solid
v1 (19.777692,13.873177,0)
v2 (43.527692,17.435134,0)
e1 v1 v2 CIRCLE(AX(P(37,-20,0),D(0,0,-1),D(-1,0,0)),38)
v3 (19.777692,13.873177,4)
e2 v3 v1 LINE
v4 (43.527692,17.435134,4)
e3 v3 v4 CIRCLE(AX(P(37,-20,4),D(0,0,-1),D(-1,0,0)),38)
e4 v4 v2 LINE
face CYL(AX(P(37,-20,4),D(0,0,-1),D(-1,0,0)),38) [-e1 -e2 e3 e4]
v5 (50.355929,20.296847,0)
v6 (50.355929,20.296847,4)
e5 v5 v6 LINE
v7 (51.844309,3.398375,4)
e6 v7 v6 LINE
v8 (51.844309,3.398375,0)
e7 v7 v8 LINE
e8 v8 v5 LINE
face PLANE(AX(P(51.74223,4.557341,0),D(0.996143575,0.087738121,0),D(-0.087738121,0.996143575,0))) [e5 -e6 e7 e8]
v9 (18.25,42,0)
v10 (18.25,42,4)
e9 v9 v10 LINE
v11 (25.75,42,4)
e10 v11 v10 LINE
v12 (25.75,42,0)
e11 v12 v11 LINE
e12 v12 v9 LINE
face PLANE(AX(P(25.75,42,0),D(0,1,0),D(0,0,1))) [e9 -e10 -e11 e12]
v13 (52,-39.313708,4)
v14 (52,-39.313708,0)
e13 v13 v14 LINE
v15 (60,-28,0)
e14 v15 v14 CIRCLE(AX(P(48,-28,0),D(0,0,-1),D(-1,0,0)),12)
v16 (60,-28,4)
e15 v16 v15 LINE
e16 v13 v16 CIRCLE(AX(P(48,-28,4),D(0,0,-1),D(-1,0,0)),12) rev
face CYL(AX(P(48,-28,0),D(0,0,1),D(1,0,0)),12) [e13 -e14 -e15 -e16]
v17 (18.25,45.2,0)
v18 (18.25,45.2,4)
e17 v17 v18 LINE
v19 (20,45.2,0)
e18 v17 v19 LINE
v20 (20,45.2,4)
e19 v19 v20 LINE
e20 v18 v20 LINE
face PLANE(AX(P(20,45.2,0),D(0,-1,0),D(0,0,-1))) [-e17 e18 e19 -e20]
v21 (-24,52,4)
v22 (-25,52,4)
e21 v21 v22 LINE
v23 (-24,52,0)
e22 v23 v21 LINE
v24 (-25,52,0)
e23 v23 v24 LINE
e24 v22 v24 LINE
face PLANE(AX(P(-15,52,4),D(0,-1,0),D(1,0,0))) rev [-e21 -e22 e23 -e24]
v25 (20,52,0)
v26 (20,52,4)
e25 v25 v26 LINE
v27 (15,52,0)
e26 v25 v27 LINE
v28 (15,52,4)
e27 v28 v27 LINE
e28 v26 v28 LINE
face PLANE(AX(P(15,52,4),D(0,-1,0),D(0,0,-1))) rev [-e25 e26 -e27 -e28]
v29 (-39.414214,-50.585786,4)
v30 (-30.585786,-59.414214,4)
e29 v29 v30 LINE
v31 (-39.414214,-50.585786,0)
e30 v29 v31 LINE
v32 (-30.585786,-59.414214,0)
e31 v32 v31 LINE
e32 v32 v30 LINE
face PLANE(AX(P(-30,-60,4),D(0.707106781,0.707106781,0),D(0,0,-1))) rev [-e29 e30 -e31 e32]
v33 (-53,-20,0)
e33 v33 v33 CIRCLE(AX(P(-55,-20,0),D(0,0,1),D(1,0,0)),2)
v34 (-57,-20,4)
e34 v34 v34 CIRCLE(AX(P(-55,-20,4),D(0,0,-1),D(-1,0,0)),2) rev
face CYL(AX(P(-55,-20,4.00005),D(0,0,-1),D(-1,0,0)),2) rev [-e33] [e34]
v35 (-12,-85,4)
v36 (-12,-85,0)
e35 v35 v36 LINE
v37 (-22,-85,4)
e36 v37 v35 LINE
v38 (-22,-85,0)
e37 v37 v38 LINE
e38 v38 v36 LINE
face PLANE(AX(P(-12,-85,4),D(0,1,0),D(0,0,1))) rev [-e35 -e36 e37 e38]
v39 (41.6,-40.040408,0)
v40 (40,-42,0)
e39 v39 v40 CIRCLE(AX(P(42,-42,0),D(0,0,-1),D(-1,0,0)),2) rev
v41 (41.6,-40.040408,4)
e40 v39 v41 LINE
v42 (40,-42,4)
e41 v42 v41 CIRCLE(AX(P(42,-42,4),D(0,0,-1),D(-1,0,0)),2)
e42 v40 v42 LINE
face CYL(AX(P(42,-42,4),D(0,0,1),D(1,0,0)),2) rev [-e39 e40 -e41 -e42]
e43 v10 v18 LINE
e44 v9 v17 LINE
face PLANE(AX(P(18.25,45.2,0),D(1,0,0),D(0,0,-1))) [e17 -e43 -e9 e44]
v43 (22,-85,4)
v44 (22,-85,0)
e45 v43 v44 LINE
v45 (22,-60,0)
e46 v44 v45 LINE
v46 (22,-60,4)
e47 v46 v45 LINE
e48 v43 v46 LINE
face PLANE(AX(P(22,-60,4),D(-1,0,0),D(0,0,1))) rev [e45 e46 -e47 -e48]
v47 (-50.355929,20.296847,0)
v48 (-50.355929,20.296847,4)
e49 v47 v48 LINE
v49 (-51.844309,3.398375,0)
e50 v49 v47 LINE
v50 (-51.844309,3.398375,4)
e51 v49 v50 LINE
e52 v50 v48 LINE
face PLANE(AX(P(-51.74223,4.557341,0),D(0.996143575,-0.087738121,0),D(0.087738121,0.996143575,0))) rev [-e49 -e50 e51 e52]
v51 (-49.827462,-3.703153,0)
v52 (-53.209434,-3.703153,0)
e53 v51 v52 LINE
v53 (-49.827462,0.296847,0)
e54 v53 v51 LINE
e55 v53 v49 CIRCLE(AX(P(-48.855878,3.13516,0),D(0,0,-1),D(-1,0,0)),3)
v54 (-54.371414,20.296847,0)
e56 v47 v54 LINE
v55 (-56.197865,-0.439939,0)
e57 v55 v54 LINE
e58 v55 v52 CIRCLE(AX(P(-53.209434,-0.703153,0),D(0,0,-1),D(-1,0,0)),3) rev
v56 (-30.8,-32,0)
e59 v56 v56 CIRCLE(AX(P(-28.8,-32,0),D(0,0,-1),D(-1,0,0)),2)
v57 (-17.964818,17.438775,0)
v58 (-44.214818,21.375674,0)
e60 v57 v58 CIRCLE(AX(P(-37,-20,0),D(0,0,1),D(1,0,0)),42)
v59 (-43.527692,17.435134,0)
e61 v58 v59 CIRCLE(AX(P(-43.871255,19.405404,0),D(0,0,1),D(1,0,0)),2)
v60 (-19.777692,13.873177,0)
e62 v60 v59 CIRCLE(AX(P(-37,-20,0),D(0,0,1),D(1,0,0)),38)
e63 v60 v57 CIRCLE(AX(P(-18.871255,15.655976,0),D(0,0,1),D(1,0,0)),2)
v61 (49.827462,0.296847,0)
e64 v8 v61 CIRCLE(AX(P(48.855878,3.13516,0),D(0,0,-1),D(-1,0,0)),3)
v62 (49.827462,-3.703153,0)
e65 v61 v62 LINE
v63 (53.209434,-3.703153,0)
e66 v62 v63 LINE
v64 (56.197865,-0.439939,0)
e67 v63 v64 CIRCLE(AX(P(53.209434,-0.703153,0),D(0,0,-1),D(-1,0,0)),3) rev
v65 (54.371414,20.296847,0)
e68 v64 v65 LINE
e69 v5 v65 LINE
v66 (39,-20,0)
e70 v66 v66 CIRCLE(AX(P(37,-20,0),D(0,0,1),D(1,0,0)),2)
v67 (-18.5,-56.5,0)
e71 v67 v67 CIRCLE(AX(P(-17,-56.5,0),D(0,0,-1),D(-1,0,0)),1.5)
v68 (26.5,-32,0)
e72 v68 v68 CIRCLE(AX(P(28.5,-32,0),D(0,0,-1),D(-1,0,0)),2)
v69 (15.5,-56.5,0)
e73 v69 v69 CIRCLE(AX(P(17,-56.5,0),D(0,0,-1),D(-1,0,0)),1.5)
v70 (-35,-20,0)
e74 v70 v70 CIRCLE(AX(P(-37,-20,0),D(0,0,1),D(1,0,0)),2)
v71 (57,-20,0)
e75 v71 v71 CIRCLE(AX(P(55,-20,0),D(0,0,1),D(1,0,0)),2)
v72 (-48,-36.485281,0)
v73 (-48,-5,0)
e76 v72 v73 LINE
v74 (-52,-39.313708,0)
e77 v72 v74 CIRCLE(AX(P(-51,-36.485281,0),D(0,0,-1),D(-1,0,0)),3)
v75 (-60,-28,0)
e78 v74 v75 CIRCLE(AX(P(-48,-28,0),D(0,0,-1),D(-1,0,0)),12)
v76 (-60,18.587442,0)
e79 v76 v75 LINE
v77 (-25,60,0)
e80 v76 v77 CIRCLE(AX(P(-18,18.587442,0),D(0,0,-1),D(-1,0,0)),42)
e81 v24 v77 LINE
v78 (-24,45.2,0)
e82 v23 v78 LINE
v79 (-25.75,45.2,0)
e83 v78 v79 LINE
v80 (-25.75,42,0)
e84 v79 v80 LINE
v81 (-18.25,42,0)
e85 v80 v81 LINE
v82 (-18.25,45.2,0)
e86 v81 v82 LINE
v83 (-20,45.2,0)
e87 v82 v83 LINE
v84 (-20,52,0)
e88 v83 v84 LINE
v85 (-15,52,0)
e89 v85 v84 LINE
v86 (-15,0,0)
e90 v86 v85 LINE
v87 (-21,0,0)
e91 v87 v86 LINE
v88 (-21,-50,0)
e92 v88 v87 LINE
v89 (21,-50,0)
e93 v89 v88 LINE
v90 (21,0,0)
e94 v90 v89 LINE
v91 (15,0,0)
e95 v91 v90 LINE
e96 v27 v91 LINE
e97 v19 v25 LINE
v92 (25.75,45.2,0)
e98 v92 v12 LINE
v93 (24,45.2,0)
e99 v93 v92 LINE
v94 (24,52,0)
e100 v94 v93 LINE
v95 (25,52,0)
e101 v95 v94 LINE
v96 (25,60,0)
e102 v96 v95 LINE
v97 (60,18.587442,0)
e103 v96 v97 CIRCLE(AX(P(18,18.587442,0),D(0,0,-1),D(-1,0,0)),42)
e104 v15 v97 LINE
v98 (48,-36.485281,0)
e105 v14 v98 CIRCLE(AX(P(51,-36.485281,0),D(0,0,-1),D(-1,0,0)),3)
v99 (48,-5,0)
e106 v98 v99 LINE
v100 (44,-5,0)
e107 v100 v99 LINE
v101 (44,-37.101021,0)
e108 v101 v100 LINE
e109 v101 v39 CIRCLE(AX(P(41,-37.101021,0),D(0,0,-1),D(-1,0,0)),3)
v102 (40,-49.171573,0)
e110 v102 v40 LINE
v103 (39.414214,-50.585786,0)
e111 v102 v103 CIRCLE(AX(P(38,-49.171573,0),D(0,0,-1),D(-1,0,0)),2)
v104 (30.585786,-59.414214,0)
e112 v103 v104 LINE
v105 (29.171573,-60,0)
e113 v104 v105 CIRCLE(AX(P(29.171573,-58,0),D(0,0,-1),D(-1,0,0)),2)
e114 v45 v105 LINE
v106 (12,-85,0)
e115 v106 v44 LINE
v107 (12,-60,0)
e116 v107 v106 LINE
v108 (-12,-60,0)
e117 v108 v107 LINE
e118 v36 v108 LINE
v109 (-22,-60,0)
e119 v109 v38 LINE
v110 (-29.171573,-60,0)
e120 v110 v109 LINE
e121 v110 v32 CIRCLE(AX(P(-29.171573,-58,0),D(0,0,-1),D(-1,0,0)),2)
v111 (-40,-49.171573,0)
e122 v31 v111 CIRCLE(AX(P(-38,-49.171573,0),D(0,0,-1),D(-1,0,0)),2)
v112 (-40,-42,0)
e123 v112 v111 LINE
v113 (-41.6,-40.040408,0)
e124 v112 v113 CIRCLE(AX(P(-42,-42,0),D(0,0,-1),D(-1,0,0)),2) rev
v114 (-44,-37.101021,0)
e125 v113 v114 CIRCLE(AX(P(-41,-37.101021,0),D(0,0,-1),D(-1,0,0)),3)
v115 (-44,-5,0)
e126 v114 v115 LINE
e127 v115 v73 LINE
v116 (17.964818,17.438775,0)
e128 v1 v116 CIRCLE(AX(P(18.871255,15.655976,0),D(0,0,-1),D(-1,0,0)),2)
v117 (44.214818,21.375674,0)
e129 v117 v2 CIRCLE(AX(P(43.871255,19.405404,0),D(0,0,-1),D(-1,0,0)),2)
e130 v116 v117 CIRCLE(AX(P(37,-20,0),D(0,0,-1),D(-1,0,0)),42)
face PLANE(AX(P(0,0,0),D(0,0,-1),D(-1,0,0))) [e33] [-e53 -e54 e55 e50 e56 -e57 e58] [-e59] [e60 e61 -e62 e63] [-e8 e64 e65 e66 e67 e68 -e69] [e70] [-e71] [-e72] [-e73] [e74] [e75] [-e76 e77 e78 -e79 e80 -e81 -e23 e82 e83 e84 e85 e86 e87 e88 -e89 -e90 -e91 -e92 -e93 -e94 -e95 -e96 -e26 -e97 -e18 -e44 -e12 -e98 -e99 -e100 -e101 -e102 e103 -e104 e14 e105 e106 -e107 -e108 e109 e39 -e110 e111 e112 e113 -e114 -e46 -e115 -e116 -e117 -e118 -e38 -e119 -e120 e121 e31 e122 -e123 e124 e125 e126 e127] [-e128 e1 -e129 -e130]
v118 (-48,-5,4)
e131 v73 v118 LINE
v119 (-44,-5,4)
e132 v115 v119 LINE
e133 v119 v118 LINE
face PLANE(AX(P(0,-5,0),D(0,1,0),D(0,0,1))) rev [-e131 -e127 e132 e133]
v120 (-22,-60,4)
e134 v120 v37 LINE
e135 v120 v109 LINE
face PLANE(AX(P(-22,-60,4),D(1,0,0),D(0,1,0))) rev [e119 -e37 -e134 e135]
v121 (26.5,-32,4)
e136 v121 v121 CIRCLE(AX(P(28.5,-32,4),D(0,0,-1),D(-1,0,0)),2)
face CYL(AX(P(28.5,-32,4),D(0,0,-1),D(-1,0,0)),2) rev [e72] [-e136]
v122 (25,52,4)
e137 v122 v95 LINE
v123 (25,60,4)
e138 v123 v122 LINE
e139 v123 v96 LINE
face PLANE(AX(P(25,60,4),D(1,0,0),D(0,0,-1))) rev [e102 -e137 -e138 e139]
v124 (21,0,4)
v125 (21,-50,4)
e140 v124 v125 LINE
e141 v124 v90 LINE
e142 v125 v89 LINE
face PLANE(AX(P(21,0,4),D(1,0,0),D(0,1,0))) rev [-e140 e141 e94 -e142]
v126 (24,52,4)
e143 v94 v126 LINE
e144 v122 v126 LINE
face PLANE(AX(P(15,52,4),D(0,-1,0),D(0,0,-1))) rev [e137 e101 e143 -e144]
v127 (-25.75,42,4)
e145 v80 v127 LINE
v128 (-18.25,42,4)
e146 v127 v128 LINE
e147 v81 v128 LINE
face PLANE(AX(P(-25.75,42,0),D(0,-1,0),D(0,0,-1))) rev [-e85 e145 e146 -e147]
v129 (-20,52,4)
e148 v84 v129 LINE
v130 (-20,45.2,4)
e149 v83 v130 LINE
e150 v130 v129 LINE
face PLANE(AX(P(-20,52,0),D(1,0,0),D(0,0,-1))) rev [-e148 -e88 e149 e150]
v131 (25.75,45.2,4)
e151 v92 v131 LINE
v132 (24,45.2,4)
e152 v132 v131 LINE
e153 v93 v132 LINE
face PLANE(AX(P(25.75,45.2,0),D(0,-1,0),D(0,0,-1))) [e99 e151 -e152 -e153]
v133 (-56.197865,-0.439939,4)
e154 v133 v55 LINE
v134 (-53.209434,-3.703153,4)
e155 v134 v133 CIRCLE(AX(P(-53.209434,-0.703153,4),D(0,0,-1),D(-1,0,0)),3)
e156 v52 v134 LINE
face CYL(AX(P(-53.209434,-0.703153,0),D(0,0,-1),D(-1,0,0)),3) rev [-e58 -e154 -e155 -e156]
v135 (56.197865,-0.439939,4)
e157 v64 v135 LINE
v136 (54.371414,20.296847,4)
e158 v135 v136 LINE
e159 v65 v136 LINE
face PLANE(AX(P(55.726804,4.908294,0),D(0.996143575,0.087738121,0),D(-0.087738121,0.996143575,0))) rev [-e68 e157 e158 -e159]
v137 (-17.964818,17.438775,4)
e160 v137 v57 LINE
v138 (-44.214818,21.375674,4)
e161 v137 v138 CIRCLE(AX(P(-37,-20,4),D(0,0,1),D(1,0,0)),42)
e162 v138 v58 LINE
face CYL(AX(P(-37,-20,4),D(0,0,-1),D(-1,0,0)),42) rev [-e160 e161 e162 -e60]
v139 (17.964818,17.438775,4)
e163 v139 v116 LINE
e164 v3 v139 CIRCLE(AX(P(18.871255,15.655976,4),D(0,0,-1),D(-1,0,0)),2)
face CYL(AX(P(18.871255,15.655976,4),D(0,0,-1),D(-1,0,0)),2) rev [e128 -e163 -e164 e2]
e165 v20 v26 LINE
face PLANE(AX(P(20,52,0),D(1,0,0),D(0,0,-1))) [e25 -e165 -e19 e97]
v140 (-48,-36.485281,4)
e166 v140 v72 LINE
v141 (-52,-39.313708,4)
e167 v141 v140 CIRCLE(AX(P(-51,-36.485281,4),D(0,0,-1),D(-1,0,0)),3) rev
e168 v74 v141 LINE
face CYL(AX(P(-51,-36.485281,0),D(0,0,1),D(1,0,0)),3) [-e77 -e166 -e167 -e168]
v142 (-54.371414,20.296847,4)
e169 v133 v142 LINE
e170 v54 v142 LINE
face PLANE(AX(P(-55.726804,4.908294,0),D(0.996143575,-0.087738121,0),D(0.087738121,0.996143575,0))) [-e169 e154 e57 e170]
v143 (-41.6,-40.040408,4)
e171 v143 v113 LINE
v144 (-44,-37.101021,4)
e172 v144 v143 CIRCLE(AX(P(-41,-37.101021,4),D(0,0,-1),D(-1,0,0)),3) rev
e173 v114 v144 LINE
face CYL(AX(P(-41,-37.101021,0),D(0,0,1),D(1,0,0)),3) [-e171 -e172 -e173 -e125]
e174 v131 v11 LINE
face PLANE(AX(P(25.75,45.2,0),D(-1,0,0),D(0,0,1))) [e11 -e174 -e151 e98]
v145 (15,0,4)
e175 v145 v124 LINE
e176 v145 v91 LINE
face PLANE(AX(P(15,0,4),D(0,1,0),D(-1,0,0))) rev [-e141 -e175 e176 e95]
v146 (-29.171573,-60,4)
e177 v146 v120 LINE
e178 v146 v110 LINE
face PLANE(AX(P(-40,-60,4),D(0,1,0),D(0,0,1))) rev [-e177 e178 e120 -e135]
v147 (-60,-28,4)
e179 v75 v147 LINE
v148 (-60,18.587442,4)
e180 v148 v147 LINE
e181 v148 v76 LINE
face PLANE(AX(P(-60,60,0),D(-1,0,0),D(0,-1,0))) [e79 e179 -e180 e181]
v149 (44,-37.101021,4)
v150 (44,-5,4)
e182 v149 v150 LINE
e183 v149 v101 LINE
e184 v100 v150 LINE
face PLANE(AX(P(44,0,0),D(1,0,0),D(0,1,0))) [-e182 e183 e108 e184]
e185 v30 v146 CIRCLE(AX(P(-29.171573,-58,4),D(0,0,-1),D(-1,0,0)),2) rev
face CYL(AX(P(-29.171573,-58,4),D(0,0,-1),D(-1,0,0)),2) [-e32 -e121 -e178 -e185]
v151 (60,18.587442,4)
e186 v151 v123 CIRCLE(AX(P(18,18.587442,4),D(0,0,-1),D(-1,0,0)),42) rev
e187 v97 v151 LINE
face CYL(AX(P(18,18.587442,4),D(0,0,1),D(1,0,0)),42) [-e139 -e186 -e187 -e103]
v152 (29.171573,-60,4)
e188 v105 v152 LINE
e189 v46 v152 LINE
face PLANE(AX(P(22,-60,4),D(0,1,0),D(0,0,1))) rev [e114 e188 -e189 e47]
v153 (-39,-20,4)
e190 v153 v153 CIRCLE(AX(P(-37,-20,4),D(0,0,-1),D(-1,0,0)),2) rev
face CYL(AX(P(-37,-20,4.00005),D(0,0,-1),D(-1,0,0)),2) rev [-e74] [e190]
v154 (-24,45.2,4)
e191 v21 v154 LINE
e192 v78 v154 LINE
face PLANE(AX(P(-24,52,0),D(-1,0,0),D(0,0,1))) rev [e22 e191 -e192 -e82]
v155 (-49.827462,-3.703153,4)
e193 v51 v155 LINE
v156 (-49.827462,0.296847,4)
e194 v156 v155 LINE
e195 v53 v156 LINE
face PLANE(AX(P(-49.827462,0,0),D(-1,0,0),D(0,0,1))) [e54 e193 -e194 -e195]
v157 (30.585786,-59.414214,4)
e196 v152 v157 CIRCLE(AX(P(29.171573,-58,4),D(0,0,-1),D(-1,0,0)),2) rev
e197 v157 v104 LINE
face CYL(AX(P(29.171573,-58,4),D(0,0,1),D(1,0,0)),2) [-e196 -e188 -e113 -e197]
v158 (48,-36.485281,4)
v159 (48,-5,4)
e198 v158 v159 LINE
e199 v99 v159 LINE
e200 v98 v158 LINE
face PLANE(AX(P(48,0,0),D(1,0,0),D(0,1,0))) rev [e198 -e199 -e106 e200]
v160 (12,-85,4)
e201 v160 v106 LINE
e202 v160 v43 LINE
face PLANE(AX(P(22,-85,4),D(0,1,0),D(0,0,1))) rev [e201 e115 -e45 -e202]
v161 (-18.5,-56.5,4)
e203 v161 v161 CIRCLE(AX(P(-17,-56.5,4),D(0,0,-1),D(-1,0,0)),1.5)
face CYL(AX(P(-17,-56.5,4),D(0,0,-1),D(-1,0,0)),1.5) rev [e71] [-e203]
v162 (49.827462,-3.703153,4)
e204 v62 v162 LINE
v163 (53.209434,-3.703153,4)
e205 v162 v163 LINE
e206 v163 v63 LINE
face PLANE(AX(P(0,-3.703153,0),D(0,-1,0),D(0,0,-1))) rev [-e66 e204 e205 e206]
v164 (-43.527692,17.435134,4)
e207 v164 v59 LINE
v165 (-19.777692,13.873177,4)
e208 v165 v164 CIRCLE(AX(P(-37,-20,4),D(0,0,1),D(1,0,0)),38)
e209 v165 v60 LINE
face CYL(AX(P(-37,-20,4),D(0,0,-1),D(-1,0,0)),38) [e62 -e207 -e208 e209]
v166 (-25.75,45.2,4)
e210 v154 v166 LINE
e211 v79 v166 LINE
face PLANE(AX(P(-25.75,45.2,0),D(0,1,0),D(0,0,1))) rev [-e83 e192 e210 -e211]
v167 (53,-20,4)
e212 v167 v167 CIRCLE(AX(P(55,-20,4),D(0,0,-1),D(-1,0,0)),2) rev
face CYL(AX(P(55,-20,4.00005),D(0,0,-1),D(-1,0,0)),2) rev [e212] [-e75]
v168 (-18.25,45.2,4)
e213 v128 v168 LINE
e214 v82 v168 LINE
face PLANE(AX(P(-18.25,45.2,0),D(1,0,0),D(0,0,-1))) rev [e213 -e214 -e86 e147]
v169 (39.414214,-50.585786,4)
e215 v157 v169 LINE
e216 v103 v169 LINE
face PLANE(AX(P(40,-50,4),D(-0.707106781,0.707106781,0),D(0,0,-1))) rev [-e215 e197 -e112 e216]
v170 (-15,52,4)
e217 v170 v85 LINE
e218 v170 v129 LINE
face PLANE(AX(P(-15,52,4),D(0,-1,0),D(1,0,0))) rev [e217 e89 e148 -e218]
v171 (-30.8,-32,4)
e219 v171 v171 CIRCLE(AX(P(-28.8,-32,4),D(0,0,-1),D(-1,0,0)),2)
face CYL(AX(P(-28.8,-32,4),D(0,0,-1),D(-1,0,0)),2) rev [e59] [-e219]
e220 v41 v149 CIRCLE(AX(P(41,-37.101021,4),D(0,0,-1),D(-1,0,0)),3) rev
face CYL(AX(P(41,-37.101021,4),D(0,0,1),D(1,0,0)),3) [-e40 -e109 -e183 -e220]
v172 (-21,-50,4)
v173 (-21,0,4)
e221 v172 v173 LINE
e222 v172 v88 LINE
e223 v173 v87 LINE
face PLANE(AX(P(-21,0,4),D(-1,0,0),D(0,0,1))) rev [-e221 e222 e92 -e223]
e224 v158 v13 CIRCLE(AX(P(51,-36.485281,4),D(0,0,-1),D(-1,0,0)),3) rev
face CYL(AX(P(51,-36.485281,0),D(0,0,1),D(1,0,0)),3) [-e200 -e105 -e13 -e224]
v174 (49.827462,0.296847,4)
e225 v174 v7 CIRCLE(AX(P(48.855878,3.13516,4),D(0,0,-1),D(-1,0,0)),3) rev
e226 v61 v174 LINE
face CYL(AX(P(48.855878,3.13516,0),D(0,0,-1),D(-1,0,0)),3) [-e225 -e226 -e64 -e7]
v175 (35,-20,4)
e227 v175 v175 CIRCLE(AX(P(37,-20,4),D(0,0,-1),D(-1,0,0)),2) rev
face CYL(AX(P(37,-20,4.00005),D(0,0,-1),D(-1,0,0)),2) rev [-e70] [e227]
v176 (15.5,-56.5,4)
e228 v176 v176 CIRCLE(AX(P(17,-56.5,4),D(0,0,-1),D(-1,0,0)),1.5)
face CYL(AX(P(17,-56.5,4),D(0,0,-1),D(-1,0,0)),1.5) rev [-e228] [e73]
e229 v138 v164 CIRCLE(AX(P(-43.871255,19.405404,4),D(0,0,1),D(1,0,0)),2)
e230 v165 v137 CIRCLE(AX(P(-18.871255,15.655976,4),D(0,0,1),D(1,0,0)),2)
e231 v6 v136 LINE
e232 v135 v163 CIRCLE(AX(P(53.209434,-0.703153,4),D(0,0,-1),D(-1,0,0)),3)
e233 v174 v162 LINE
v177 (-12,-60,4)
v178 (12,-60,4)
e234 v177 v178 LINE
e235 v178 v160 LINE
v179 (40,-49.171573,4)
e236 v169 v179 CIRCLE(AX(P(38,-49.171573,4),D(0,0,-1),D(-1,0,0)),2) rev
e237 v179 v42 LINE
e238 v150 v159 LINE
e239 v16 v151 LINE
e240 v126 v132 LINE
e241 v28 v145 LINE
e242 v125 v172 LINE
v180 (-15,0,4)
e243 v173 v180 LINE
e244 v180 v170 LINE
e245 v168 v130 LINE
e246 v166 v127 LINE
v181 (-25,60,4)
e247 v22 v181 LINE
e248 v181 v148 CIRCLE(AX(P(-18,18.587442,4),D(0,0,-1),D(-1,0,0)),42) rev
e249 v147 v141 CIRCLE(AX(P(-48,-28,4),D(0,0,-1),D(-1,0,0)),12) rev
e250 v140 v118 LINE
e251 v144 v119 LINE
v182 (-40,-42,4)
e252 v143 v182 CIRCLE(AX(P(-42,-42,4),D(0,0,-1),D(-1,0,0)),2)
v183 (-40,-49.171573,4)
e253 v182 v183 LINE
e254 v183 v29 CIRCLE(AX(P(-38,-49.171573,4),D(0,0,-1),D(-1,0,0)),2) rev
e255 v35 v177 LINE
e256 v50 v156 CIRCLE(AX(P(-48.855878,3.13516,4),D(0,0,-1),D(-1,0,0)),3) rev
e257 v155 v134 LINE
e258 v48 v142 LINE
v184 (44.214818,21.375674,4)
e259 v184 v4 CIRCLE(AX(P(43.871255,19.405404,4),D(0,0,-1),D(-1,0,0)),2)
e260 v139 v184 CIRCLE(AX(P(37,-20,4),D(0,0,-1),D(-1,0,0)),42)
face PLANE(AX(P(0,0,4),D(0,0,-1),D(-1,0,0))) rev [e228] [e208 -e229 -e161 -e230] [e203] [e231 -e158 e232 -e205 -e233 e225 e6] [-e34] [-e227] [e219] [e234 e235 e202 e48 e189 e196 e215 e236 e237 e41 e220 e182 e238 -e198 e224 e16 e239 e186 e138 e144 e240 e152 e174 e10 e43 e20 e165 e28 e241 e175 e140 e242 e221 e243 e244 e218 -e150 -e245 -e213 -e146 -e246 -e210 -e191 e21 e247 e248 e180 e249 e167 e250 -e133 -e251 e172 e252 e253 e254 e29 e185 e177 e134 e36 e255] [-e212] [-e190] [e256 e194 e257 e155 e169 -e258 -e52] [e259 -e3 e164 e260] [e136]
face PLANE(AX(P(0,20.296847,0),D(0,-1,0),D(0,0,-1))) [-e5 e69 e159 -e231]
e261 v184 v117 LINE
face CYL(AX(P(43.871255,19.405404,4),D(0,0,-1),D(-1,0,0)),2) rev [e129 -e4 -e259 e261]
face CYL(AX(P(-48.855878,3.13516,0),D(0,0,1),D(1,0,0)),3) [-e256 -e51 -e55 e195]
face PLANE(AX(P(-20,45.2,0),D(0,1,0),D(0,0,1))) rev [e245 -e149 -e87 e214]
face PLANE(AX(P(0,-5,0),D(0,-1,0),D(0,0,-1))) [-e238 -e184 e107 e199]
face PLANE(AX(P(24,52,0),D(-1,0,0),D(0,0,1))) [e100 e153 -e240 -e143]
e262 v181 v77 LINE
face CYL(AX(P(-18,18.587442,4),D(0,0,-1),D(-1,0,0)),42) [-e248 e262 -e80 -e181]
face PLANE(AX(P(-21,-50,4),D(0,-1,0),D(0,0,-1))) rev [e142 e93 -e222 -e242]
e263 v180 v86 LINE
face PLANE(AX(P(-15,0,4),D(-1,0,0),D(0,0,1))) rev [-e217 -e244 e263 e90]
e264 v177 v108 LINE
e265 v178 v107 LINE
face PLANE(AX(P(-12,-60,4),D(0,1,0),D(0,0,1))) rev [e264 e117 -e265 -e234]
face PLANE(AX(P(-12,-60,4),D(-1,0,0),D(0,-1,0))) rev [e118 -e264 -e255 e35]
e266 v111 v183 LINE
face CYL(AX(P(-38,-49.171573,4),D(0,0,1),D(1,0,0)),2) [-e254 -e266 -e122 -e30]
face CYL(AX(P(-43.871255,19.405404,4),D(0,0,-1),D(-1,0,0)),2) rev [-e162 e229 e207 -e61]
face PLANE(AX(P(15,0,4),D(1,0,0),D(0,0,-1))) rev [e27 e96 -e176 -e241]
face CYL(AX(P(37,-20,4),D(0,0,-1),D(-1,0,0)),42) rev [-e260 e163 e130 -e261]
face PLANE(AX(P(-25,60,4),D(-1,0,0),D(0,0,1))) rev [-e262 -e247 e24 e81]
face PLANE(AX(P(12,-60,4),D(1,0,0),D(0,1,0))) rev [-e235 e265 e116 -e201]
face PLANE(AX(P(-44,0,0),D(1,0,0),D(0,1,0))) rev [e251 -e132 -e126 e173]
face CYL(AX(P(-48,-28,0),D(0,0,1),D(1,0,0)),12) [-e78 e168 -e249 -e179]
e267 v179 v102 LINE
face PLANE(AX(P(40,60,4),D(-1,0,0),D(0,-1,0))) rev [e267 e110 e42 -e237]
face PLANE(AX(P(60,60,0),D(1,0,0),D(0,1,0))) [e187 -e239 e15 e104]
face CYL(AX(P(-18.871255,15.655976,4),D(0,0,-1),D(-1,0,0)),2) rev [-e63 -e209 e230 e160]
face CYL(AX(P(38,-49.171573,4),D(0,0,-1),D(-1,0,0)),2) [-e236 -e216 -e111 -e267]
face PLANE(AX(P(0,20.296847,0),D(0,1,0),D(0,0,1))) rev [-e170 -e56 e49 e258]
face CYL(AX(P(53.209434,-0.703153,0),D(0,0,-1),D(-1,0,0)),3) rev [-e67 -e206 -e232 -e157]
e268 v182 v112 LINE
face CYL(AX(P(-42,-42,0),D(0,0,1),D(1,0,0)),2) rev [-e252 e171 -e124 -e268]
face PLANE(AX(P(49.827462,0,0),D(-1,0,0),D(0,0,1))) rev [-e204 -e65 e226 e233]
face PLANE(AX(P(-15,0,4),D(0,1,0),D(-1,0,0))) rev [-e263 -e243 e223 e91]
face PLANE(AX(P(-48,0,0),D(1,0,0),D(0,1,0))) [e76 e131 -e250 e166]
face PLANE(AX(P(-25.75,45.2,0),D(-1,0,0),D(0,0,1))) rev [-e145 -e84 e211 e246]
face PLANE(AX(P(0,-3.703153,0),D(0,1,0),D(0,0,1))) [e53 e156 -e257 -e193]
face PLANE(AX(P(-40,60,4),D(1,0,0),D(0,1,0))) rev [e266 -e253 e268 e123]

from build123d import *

# Parameters (mm, degrees)
BOSS_EXTRUDE1_DEPTH = 4
SKETCH2_R           = 2
SKETCH2_R_2         = 1.5
CUT_EXTRUDE1_DEPTH  = 95.026591983
SKETCH4_W           = 20
SKETCH4_H           = 100
BOSS_EXTRUDE2_DEPTH = 4
FILLET3_R           = 42
FILLET4_R           = 12
SKETCH7_R           = 2
CUT_EXTRUDE3_DEPTH  = 105.120122935
CHAMFER1_SIZE       = 10
FILLET8_R           = 2
CUT_EXTRUDE4_DEPTH  = 105.120122935
CUT_EXTRUDE5_DEPTH  = 105.120122935
SKETCH10_W          = 4
SKETCH10_H          = 35
CUT_EXTRUDE6_DEPTH  = 105.120122935
FILLET9_R           = 3


with BuildPart() as part:
    # Sketch1 → Boss-Extrude1 (new body)
    with BuildSketch(Plane.XY):
        Polygon((-40, 60), (-25, 60), (-25, 52), (-15, 52), (-15, 0), (-21, 0), (-21, -50), (21, -50), (21, 0), (15, 0), (15, 52), (25, 52), (25, 60), (40, 60), (40, -60), (22, -60), (22, -85), (12, -85), (12, -60), (-12, -60), (-12, -85), (-22, -85), (-22, -60), (-40, -60), align=None)
    extrude(amount=BOSS_EXTRUDE1_DEPTH)

    # Sketch2 → Cut-Extrude1 (cut, through all)
    with BuildSketch(Plane(origin=(0, 0, 0), x_dir=(-1, 0, 0), z_dir=(0, 0, -1))):
        with Locations((-28.5, -32)):
            Circle(SKETCH2_R)
        with Locations((17, -56.5)):
            Circle(SKETCH2_R_2)
        with Locations((28.8, -32)):
            Circle(SKETCH2_R)
        with Locations((-17, -56.5)):
            Circle(SKETCH2_R_2)
    extrude(amount=-CUT_EXTRUDE1_DEPTH, mode=Mode.SUBTRACT)

    # Sketch4 → Boss-Extrude2 (add)
    with BuildSketch(Plane.XY.offset(4)):
        with Locations((-50, 10)):
            Rectangle(SKETCH4_W, SKETCH4_H)
        with Locations((50, 10)):
            Rectangle(SKETCH4_W, SKETCH4_H)
    extrude(amount=-BOSS_EXTRUDE2_DEPTH)

    # Fillet3
    # the kernel refuses this fillet: 42 mm, written as the material it takes off along each edge
    with BuildSketch(Plane(origin=(60, 60, 107.531396204), x_dir=(0, -1, 0), z_dir=(0, 0, -1))) as fillet3_piece_1:
        with BuildLine():
            CenterArc((41.412558482, 42), FILLET3_R, 189.594068227, 80.405931773)
            Line((0, 35), (-0.82825117, 34.86))
            ThreePointArc((-0.82825117, 34.86), (-0.84, 17.5), (-0.84, 0))
            Line((-0.84, 0), (0, -0.84))
            Line((0, -0.84), (41.412558482, -0.84))
            Line((41.412558482, -0.84), (41.412558482, 0))
        make_face()
    extrude(amount=211.062792409, mode=Mode.SUBTRACT)
    with BuildSketch(Plane(origin=(-60, 60, 107.531396204), x_dir=(1, 0, 0), z_dir=(0, 0, -1))) as fillet3_piece_2:
        with BuildLine():
            CenterArc((42, 41.412558482), FILLET3_R, 180, 80.405931773)
            Line((0, 41.412558482), (-0.84, 41.412558482))
            Line((-0.84, 41.412558482), (-0.84, 0))
            Line((-0.84, 0), (0, -0.84))
            ThreePointArc((0, -0.84), (17.5, -0.84), (34.86, -0.82825117))
            Line((34.86, -0.82825117), (35, 0))
        make_face()
    extrude(amount=211.062792409, mode=Mode.SUBTRACT)

    # Fillet4
    fillet4_edges = [part.edges().sort_by_distance(p)[0] for p in [
        (60, -40, 2),
        (-60, -40, 2),
    ]]
    fillet(fillet4_edges, radius=FILLET4_R)

    # Sketch7 → Cut-Extrude3 (cut, through all)
    with BuildSketch(Plane.XY):
        with Locations(Location((-55, -20, 0), (0, 0, 180))):
            Circle(SKETCH7_R)
        with Locations(Location((55, -20, 0), (0, 0, 180))):
            Circle(SKETCH7_R)
        with Locations(Location((-37, -20, 0), (0, 0, 180))):
            Circle(SKETCH7_R)
        with Locations(Location((37, -20, 0), (0, 0, 180))):
            Circle(SKETCH7_R)
    extrude(amount=CUT_EXTRUDE3_DEPTH, mode=Mode.SUBTRACT)

    # Chamfer1
    chamfer1_edges = [part.edges().sort_by_distance(p)[0] for p in [
        (-40, -60, 2),
        (40, -60, 2),
    ]]
    chamfer(chamfer1_edges, length=CHAMFER1_SIZE)

    # Fillet8
    fillet8_edges = [part.edges().sort_by_distance(p)[0] for p in [
        (-30, -60, 2),
        (-40, -50, 2),
        (30, -60, 2),
        (40, -50, 2),
        (40, -40, 2),
        (-40, -40, 2),
    ]]
    fillet(fillet8_edges, radius=FILLET8_R)

    # Sketch8 → Cut-Extrude4 (cut, through all)
    with BuildSketch(Plane(origin=(0, 0, 0), x_dir=(-1, 0, 0), z_dir=(0, 0, -1))):
        with BuildLine():
            ThreePointArc((-17.964817996, 17.438774634), (-30.770630407, 21.535466224), (-44.214817996, 21.375674028))
            ThreePointArc((-44.214817996, 21.375674028), (-45.841525426, 19.061841075), (-43.527692473, 17.435133644))
            ThreePointArc((-43.527692473, 17.435133644), (-31.363903701, 17.579707536), (-19.777692473, 13.87317705))
            ThreePointArc((-19.777692473, 13.87317705), (-17.088456442, 14.749538603), (-17.964817996, 17.438774634))
        make_face()
        with BuildLine():
            ThreePointArc((17.964817996, 17.438774634), (30.770630407, 21.535466224), (44.214817996, 21.375674028))
            ThreePointArc((44.214817996, 21.375674028), (45.841525426, 19.061841075), (43.527692473, 17.435133644))
            ThreePointArc((43.527692473, 17.435133644), (31.363903701, 17.579707536), (19.777692473, 13.87317705))
            ThreePointArc((19.777692473, 13.87317705), (17.088456442, 14.749538603), (17.964817996, 17.438774634))
        make_face()
    extrude(amount=-CUT_EXTRUDE4_DEPTH, mode=Mode.SUBTRACT)

    # Sketch9 → Cut-Extrude5 (cut, through all)
    with BuildSketch(Plane.XY.offset(4)):
        Polygon((-24, 52), (-20, 52), (-20, 45.2), (-18.25, 45.2), (-18.25, 42), (-25.75, 42), (-25.75, 45.2), (-24, 45.2), align=None)
    cut_extrude5 = extrude(amount=-CUT_EXTRUDE5_DEPTH, mode=Mode.SUBTRACT)

    # Mirror1: Cut-Extrude5 across plane
    add(cut_extrude5.mirror(Plane(origin=(0, 0, 0), x_dir=(0, 0, 1), z_dir=(1, 0, 0))), mode=Mode.SUBTRACT)

    # Sketch10 → Cut-Extrude6 (cut, through all)
    with BuildSketch(Plane.XY.offset(4)):
        with Locations((46, -22.5)):
            Rectangle(SKETCH10_W, SKETCH10_H)
        Polygon((49.827462353, 0.296846572), (49.827462353, -3.703153428), (56.485281374, -3.703153428), (54.371414492, 20.296846572), (50.355929074, 20.296846572), (52.117484809, 0.296846572), align=None)
    cut_extrude6 = extrude(amount=-CUT_EXTRUDE6_DEPTH, mode=Mode.SUBTRACT)

    # Mirror2: Cut-Extrude6 across plane
    add(cut_extrude6.mirror(Plane(origin=(0, 0, 0), x_dir=(0, 0, 1), z_dir=(1, 0, 0))), mode=Mode.SUBTRACT)

    # Fillet9
    # the kernel refuses this fillet: 3 mm, written as the material it adds along each edge
    with BuildSketch(Plane(origin=(56.485281374, -3.703153428, 4), x_dir=(-1, 0, 0), z_dir=(0, 0, -1))) as fillet9_piece_1:
        with BuildLine():
            CenterArc((FILLET9_R * 1.09194914132, FILLET9_R), FILLET9_R, 174.966503844, 95.033496156)
            Line((FILLET9_R * 0.0958055662996, FILLET9_R * 1.08773812138), (0, 0))
            Line((0, 0), (FILLET9_R * 1.09194914132, 0))
        make_face()
    extrude(amount=4)
    with BuildSketch(Plane(origin=(-56.485281374, -3.703153428, 4), x_dir=(1, 0, 0), z_dir=(0, 0, -1))) as fillet9_piece_2:
        with BuildLine():
            CenterArc((FILLET9_R * 1.09194914132, -FILLET9_R), FILLET9_R, 90, 95.033496156)
            Line((FILLET9_R * 0.0958055662996, -FILLET9_R * 1.08773812138), (0, 0))
            Line((0, 0), (FILLET9_R * 1.09194914132, 0))
        make_face()
    extrude(amount=4)
    # the kernel refuses this fillet: 3 mm, written as the material it takes off along each edge
    with BuildSketch(Plane(origin=(52.117484809, 0.296846572, 11.783837895), x_dir=(-1, 0, 0), z_dir=(0, 0, -1))) as fillet9_2_piece_1:
        with BuildLine():
            CenterArc((3.261606451, 2.838313679), FILLET9_R, 174.966503844, 76.136892771)
            Line((0.273175726, 3.101528043), (0, 0))
            Line((0, 0), (2.290022456, 0))
        make_face()
    extrude(amount=19.56767579, mode=Mode.SUBTRACT)
    with BuildSketch(Plane(origin=(48, -40, 14.146118724), x_dir=(0, 1, 0), z_dir=(0, 0, -1))) as fillet9_2_piece_2:
        with BuildLine():
            CenterArc((3.514718626, 3), FILLET9_R, 160.528779366, 109.471220634)
            ThreePointArc((0.686291501, 4), (0.172817284, 2.029223745), (0, 0))
            Line((0, 0), (3.514718626, 0))
        make_face()
    extrude(amount=24.292237447, mode=Mode.SUBTRACT)
    with BuildSketch(Plane(origin=(44, -40, 11.247448714), x_dir=(-0.9998582920116396, -0.01683436650328442, 0), z_dir=(0, 0, -1))) as fillet9_2_piece_3:
        with BuildLine():
            CenterArc((2.950772393, 2.949071777), FILLET9_R, 180.964583715, 78.463040967)
            Line((-0.048802483, 2.898568677), (-0.348759971, 2.893518367))
            Line((-0.348759971, 2.893518367), (-0.299957488, -0.00505031))
            Line((-0.299957488, -0.00505031), (0.00505031, -0.299957488))
            ThreePointArc((0.00505031, -0.299957488), (2.004766894, -0.266288755), (2.345296923, -0.294907178))
            Line((2.345296923, -0.294907178), (2.400340147, 0))
        make_face()
    extrude(amount=18.494897428, mode=Mode.SUBTRACT)
    with BuildSketch(Plane(origin=(-44, -40, 11.247448714), x_dir=(0, 1, 0), z_dir=(0, 0, -1))) as fillet9_2_piece_4:
        with BuildLine():
            CenterArc((2.898979486, 3), FILLET9_R, 191.536959033, 78.463040967)
            Line((-0.040408206, 2.4), (-0.334346975, 2.34))
            ThreePointArc((-0.334346975, 2.34), (-0.3, 2), (-0.3, 0))
            Line((-0.3, 0), (0, -0.3))
            Line((0, -0.3), (2.898979486, -0.3))
            Line((2.898979486, -0.3), (2.898979486, 0))
        make_face()
    extrude(amount=18.494897428, mode=Mode.SUBTRACT)
    with BuildSketch(Plane(origin=(-48, -40, 14.146118724), x_dir=(-0.9855985596534866, 0.16910197872577487, 0), z_dir=(0, 0, -1))) as fillet9_2_piece_5:
        with BuildLine():
            CenterArc((3.551141553, 2.956795679), FILLET9_R, 170.264389683, 109.471220634)
            Line((0.594345874, 3.464101615), (0, 0))
            ThreePointArc((0, 0), (2.029223745, -0.172817284), (4.058447489, 0))
        make_face()
    extrude(amount=24.292237447, mode=Mode.SUBTRACT)
    with BuildSketch(Plane(origin=(-52.117484809, 0.296846572, 11.783837895), x_dir=(0.08773812137778342, 0.9961435750217422, 0), z_dir=(0, 0, -1))) as fillet9_2_piece_6:
        with BuildLine():
            CenterArc((3.113535158, 3), FILLET9_R, 193.863107229, 76.136892771)
            Line((0.200922268, 2.281191156), (0, 0))
            Line((0, 0), (3.113535158, 0))
        make_face()
    extrude(amount=19.56767579, mode=Mode.SUBTRACT)


solid = part.part
